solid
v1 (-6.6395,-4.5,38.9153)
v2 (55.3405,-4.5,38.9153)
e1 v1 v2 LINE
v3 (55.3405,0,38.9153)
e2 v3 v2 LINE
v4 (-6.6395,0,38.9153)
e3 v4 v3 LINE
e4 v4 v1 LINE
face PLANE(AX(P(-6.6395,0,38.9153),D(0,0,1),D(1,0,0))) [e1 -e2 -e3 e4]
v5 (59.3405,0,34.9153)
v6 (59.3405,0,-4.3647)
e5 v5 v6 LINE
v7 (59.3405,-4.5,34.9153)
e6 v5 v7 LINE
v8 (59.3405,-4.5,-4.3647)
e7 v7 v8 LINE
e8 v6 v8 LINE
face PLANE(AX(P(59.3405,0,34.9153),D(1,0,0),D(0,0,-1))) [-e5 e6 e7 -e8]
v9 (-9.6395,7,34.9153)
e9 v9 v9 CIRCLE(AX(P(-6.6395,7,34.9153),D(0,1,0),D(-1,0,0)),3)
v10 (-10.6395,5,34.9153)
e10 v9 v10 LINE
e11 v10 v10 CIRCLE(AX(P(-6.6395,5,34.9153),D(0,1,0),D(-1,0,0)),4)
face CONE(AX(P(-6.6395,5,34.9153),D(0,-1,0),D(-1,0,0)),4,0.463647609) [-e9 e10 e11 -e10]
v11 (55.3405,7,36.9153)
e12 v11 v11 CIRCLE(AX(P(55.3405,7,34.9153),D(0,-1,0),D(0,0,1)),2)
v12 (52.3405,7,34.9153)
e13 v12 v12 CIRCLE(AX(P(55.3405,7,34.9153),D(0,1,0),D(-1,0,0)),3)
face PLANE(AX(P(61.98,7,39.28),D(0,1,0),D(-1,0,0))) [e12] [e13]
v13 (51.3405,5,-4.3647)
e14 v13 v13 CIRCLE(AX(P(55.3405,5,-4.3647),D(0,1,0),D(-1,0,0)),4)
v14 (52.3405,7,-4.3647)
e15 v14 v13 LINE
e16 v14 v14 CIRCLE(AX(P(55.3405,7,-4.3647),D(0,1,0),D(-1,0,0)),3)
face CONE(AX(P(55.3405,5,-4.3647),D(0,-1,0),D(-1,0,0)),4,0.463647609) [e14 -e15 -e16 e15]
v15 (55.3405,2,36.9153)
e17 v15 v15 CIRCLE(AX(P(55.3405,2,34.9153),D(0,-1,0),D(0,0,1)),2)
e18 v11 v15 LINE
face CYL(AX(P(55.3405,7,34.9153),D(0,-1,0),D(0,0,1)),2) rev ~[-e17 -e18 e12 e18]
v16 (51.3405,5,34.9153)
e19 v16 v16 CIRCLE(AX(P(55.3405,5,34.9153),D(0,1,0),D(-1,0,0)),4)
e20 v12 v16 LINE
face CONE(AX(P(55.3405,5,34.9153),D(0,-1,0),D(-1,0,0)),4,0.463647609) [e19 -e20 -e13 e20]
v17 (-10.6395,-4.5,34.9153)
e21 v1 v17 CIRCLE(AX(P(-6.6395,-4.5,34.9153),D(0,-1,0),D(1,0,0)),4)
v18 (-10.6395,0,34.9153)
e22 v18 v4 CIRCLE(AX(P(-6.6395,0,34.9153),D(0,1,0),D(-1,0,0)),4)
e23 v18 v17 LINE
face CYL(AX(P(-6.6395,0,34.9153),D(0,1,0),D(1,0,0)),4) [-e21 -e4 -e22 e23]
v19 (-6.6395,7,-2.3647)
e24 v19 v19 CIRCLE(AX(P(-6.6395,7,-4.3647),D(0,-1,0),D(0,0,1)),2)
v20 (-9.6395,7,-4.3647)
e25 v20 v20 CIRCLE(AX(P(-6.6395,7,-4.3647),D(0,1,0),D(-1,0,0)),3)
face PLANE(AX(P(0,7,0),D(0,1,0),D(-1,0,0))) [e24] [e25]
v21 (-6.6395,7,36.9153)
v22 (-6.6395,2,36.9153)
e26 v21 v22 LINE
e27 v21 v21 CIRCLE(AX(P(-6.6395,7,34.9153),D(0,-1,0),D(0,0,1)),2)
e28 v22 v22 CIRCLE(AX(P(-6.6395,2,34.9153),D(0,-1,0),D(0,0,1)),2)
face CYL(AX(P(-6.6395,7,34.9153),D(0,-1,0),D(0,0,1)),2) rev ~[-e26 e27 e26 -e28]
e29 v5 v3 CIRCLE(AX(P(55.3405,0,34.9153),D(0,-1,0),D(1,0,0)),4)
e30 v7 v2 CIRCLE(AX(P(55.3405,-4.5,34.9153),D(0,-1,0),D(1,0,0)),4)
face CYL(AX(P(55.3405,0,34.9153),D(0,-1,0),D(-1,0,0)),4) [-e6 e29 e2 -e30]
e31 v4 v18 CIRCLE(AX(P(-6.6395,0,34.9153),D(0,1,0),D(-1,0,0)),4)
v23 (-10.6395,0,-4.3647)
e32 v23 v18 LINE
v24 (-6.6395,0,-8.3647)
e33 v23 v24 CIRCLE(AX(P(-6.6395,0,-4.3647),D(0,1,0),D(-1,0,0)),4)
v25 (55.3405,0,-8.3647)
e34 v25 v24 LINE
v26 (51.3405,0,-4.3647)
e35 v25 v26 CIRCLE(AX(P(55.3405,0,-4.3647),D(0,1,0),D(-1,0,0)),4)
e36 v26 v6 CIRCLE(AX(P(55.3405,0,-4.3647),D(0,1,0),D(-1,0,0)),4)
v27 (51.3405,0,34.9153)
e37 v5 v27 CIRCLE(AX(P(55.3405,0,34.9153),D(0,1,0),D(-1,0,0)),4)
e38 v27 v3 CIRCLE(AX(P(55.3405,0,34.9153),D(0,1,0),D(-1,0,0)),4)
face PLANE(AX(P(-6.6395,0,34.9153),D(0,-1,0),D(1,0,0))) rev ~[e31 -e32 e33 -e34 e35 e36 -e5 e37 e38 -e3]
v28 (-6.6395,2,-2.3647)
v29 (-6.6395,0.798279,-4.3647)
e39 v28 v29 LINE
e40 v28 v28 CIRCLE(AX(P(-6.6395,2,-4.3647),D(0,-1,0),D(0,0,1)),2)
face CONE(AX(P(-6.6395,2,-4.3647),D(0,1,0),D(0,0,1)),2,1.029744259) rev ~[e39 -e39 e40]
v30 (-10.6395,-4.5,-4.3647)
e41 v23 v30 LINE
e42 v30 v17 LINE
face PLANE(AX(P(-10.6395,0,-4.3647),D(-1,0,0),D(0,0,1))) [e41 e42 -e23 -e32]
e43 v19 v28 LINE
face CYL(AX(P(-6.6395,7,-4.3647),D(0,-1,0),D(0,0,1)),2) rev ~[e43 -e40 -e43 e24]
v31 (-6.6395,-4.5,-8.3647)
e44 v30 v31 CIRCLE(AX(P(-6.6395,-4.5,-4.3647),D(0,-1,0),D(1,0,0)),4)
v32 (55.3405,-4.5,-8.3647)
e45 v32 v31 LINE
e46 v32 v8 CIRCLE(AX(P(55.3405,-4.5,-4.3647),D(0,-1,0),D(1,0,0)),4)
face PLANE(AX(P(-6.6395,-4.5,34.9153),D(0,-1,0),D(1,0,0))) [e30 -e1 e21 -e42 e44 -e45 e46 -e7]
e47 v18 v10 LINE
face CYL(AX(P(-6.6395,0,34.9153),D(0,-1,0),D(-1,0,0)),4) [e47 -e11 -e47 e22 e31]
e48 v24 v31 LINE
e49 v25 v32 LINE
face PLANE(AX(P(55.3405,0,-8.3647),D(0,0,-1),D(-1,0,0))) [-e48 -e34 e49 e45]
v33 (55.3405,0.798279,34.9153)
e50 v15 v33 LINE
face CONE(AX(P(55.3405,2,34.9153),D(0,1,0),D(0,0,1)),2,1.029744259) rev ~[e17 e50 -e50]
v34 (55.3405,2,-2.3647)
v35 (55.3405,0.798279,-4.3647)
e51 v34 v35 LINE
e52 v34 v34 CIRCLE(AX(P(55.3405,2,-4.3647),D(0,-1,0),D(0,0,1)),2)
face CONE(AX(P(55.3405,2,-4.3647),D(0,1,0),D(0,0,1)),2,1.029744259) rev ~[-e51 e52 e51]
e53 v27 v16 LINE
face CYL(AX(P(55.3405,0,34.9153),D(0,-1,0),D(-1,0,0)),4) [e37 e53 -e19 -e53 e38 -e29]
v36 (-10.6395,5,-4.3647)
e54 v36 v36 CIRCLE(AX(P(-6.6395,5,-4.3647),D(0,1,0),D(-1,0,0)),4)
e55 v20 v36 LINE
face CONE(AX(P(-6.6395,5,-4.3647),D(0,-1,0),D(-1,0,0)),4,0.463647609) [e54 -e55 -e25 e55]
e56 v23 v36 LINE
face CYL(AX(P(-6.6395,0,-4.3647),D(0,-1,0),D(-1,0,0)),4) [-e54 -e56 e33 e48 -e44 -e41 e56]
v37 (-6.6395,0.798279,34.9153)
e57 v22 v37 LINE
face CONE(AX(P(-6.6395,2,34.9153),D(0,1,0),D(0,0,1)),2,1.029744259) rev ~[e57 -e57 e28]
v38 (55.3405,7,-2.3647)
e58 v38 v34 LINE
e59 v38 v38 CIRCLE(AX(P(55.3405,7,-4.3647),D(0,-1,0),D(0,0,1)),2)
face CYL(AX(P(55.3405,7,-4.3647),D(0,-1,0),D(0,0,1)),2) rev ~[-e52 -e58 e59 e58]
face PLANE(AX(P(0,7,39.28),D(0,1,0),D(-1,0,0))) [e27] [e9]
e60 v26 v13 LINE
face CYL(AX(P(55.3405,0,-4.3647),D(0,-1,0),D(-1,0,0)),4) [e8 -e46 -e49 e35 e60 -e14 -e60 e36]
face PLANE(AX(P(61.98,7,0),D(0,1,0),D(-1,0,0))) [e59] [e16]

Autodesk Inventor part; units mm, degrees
ref_plane "YZ Plane" through (0, 0, 0) normal (1, 0, 0) x (0, 1, 0)
ref_plane "XZ Plane" through (0, 0, 0) normal (0, 1, 0) x (-1, 0, 0)
ref_plane "XY Plane" through (0, 0, 0) normal (0, 0, 1) x (1, 0, 0)
sketch "proto-board hole layout" plane through (0, 0, 0) normal (0, 1, 0) x (-1, 0, 0)
  circle A0 centre (6.6395, -4.3647) radius 1.49
  circle A1 centre (-55.3405, -4.3647) radius 1.49
  circle A2 centre (-55.3405, 34.9153) radius 1.49
  circle A3 centre (6.6395, 34.9153) radius 1.49
  line L0 (5.1495, -4.3647) -> (-53.8505, -4.3647) construction
  line L1 (5.1495, 34.9153) -> (-53.8505, 34.9153) construction
  line L2 (-55.3405, 33.4253) -> (-55.3405, -2.8747) construction
  line L3 (6.6395, 33.4253) -> (6.6395, -2.8747) construction
  dimension "d0" = 2.98
  dimension "d1" = 59
  dimension "d2" = 36.3
sketch "Sketch3" plane through (0, 0, 0) normal (0, 1, 0) x (-1, 0, 0)
  circle A0 centre (6.6395, -4.3647) radius 1.49 projected
  circle A1 centre (6.6395, -4.3647) radius 4
  point P0 (0, 0)
  dimension "d15" = 8
extrude "Extrusion2" add sketch "Sketch3" along normal blind 7 contours A0 | A1
sketch "Sketch4" plane through (-6.6395, 7, -4.3647) normal (0, 1, 0) x (1, 0, 0)
  circle A0 centre (0, 0) radius 4 construction
  point P0 (6.6395, -4.3647)
hole "Hole1" at (-6.6395, 7, -4.3647) direction (0, -1, 0) diameter 4 depth 5 tip angle 118
chamfer "Chamfer1" distance 1 distance2 2 1 edges at (-2.6395, 7, -4.3647) measured on face at (-9.9293, 7, -4.7642)
pattern_sketch "Sketch Driven Pattern1" from (-6.6395, 0, -4.3647) copies at (55.3405, 0, -4.3647) at (55.3405, 0, 34.9153) at (-6.6395, 0, 34.9153)
sketch "Sketch5" plane through (-6.6395, 0, 34.9153) normal (0, -1, 0) x (1, 0, 0)
  circle A0 centre (0, 0) radius 4 projected
  circle A1 centre (61.98, 0) radius 4 projected
  circle A2 centre (61.98, -39.28) radius 4 projected
  circle A3 centre (0, -39.28) radius 4 projected
  line L0 (-4, 4) -> (65.98, 4)
  line L1 (65.98, 4) -> (65.98, -43.28)
  line L2 (65.98, -43.28) -> (-4, -43.28)
  line L3 (-4, -43.28) -> (-4, 4)
  point P0 (6.6395, -34.9153)
  point P1 (-4, 0)
  point P2 (-4, -39.28)
  point P3 (0, -43.28)
  point P4 (61.98, -43.28)
  point P5 (65.98, -39.28)
  point P6 (65.98, 0)
  point P7 (61.98, 4)
  point P8 (0, 4)
extrude "Extrusion3" add sketch "Sketch5" along normal blind 4.5 contours A0 | A0 L0 A1 L1 A2 L2 A3 L3 | A1 | A3 | A2
properties part number "proto-board_standoffs_plate"
